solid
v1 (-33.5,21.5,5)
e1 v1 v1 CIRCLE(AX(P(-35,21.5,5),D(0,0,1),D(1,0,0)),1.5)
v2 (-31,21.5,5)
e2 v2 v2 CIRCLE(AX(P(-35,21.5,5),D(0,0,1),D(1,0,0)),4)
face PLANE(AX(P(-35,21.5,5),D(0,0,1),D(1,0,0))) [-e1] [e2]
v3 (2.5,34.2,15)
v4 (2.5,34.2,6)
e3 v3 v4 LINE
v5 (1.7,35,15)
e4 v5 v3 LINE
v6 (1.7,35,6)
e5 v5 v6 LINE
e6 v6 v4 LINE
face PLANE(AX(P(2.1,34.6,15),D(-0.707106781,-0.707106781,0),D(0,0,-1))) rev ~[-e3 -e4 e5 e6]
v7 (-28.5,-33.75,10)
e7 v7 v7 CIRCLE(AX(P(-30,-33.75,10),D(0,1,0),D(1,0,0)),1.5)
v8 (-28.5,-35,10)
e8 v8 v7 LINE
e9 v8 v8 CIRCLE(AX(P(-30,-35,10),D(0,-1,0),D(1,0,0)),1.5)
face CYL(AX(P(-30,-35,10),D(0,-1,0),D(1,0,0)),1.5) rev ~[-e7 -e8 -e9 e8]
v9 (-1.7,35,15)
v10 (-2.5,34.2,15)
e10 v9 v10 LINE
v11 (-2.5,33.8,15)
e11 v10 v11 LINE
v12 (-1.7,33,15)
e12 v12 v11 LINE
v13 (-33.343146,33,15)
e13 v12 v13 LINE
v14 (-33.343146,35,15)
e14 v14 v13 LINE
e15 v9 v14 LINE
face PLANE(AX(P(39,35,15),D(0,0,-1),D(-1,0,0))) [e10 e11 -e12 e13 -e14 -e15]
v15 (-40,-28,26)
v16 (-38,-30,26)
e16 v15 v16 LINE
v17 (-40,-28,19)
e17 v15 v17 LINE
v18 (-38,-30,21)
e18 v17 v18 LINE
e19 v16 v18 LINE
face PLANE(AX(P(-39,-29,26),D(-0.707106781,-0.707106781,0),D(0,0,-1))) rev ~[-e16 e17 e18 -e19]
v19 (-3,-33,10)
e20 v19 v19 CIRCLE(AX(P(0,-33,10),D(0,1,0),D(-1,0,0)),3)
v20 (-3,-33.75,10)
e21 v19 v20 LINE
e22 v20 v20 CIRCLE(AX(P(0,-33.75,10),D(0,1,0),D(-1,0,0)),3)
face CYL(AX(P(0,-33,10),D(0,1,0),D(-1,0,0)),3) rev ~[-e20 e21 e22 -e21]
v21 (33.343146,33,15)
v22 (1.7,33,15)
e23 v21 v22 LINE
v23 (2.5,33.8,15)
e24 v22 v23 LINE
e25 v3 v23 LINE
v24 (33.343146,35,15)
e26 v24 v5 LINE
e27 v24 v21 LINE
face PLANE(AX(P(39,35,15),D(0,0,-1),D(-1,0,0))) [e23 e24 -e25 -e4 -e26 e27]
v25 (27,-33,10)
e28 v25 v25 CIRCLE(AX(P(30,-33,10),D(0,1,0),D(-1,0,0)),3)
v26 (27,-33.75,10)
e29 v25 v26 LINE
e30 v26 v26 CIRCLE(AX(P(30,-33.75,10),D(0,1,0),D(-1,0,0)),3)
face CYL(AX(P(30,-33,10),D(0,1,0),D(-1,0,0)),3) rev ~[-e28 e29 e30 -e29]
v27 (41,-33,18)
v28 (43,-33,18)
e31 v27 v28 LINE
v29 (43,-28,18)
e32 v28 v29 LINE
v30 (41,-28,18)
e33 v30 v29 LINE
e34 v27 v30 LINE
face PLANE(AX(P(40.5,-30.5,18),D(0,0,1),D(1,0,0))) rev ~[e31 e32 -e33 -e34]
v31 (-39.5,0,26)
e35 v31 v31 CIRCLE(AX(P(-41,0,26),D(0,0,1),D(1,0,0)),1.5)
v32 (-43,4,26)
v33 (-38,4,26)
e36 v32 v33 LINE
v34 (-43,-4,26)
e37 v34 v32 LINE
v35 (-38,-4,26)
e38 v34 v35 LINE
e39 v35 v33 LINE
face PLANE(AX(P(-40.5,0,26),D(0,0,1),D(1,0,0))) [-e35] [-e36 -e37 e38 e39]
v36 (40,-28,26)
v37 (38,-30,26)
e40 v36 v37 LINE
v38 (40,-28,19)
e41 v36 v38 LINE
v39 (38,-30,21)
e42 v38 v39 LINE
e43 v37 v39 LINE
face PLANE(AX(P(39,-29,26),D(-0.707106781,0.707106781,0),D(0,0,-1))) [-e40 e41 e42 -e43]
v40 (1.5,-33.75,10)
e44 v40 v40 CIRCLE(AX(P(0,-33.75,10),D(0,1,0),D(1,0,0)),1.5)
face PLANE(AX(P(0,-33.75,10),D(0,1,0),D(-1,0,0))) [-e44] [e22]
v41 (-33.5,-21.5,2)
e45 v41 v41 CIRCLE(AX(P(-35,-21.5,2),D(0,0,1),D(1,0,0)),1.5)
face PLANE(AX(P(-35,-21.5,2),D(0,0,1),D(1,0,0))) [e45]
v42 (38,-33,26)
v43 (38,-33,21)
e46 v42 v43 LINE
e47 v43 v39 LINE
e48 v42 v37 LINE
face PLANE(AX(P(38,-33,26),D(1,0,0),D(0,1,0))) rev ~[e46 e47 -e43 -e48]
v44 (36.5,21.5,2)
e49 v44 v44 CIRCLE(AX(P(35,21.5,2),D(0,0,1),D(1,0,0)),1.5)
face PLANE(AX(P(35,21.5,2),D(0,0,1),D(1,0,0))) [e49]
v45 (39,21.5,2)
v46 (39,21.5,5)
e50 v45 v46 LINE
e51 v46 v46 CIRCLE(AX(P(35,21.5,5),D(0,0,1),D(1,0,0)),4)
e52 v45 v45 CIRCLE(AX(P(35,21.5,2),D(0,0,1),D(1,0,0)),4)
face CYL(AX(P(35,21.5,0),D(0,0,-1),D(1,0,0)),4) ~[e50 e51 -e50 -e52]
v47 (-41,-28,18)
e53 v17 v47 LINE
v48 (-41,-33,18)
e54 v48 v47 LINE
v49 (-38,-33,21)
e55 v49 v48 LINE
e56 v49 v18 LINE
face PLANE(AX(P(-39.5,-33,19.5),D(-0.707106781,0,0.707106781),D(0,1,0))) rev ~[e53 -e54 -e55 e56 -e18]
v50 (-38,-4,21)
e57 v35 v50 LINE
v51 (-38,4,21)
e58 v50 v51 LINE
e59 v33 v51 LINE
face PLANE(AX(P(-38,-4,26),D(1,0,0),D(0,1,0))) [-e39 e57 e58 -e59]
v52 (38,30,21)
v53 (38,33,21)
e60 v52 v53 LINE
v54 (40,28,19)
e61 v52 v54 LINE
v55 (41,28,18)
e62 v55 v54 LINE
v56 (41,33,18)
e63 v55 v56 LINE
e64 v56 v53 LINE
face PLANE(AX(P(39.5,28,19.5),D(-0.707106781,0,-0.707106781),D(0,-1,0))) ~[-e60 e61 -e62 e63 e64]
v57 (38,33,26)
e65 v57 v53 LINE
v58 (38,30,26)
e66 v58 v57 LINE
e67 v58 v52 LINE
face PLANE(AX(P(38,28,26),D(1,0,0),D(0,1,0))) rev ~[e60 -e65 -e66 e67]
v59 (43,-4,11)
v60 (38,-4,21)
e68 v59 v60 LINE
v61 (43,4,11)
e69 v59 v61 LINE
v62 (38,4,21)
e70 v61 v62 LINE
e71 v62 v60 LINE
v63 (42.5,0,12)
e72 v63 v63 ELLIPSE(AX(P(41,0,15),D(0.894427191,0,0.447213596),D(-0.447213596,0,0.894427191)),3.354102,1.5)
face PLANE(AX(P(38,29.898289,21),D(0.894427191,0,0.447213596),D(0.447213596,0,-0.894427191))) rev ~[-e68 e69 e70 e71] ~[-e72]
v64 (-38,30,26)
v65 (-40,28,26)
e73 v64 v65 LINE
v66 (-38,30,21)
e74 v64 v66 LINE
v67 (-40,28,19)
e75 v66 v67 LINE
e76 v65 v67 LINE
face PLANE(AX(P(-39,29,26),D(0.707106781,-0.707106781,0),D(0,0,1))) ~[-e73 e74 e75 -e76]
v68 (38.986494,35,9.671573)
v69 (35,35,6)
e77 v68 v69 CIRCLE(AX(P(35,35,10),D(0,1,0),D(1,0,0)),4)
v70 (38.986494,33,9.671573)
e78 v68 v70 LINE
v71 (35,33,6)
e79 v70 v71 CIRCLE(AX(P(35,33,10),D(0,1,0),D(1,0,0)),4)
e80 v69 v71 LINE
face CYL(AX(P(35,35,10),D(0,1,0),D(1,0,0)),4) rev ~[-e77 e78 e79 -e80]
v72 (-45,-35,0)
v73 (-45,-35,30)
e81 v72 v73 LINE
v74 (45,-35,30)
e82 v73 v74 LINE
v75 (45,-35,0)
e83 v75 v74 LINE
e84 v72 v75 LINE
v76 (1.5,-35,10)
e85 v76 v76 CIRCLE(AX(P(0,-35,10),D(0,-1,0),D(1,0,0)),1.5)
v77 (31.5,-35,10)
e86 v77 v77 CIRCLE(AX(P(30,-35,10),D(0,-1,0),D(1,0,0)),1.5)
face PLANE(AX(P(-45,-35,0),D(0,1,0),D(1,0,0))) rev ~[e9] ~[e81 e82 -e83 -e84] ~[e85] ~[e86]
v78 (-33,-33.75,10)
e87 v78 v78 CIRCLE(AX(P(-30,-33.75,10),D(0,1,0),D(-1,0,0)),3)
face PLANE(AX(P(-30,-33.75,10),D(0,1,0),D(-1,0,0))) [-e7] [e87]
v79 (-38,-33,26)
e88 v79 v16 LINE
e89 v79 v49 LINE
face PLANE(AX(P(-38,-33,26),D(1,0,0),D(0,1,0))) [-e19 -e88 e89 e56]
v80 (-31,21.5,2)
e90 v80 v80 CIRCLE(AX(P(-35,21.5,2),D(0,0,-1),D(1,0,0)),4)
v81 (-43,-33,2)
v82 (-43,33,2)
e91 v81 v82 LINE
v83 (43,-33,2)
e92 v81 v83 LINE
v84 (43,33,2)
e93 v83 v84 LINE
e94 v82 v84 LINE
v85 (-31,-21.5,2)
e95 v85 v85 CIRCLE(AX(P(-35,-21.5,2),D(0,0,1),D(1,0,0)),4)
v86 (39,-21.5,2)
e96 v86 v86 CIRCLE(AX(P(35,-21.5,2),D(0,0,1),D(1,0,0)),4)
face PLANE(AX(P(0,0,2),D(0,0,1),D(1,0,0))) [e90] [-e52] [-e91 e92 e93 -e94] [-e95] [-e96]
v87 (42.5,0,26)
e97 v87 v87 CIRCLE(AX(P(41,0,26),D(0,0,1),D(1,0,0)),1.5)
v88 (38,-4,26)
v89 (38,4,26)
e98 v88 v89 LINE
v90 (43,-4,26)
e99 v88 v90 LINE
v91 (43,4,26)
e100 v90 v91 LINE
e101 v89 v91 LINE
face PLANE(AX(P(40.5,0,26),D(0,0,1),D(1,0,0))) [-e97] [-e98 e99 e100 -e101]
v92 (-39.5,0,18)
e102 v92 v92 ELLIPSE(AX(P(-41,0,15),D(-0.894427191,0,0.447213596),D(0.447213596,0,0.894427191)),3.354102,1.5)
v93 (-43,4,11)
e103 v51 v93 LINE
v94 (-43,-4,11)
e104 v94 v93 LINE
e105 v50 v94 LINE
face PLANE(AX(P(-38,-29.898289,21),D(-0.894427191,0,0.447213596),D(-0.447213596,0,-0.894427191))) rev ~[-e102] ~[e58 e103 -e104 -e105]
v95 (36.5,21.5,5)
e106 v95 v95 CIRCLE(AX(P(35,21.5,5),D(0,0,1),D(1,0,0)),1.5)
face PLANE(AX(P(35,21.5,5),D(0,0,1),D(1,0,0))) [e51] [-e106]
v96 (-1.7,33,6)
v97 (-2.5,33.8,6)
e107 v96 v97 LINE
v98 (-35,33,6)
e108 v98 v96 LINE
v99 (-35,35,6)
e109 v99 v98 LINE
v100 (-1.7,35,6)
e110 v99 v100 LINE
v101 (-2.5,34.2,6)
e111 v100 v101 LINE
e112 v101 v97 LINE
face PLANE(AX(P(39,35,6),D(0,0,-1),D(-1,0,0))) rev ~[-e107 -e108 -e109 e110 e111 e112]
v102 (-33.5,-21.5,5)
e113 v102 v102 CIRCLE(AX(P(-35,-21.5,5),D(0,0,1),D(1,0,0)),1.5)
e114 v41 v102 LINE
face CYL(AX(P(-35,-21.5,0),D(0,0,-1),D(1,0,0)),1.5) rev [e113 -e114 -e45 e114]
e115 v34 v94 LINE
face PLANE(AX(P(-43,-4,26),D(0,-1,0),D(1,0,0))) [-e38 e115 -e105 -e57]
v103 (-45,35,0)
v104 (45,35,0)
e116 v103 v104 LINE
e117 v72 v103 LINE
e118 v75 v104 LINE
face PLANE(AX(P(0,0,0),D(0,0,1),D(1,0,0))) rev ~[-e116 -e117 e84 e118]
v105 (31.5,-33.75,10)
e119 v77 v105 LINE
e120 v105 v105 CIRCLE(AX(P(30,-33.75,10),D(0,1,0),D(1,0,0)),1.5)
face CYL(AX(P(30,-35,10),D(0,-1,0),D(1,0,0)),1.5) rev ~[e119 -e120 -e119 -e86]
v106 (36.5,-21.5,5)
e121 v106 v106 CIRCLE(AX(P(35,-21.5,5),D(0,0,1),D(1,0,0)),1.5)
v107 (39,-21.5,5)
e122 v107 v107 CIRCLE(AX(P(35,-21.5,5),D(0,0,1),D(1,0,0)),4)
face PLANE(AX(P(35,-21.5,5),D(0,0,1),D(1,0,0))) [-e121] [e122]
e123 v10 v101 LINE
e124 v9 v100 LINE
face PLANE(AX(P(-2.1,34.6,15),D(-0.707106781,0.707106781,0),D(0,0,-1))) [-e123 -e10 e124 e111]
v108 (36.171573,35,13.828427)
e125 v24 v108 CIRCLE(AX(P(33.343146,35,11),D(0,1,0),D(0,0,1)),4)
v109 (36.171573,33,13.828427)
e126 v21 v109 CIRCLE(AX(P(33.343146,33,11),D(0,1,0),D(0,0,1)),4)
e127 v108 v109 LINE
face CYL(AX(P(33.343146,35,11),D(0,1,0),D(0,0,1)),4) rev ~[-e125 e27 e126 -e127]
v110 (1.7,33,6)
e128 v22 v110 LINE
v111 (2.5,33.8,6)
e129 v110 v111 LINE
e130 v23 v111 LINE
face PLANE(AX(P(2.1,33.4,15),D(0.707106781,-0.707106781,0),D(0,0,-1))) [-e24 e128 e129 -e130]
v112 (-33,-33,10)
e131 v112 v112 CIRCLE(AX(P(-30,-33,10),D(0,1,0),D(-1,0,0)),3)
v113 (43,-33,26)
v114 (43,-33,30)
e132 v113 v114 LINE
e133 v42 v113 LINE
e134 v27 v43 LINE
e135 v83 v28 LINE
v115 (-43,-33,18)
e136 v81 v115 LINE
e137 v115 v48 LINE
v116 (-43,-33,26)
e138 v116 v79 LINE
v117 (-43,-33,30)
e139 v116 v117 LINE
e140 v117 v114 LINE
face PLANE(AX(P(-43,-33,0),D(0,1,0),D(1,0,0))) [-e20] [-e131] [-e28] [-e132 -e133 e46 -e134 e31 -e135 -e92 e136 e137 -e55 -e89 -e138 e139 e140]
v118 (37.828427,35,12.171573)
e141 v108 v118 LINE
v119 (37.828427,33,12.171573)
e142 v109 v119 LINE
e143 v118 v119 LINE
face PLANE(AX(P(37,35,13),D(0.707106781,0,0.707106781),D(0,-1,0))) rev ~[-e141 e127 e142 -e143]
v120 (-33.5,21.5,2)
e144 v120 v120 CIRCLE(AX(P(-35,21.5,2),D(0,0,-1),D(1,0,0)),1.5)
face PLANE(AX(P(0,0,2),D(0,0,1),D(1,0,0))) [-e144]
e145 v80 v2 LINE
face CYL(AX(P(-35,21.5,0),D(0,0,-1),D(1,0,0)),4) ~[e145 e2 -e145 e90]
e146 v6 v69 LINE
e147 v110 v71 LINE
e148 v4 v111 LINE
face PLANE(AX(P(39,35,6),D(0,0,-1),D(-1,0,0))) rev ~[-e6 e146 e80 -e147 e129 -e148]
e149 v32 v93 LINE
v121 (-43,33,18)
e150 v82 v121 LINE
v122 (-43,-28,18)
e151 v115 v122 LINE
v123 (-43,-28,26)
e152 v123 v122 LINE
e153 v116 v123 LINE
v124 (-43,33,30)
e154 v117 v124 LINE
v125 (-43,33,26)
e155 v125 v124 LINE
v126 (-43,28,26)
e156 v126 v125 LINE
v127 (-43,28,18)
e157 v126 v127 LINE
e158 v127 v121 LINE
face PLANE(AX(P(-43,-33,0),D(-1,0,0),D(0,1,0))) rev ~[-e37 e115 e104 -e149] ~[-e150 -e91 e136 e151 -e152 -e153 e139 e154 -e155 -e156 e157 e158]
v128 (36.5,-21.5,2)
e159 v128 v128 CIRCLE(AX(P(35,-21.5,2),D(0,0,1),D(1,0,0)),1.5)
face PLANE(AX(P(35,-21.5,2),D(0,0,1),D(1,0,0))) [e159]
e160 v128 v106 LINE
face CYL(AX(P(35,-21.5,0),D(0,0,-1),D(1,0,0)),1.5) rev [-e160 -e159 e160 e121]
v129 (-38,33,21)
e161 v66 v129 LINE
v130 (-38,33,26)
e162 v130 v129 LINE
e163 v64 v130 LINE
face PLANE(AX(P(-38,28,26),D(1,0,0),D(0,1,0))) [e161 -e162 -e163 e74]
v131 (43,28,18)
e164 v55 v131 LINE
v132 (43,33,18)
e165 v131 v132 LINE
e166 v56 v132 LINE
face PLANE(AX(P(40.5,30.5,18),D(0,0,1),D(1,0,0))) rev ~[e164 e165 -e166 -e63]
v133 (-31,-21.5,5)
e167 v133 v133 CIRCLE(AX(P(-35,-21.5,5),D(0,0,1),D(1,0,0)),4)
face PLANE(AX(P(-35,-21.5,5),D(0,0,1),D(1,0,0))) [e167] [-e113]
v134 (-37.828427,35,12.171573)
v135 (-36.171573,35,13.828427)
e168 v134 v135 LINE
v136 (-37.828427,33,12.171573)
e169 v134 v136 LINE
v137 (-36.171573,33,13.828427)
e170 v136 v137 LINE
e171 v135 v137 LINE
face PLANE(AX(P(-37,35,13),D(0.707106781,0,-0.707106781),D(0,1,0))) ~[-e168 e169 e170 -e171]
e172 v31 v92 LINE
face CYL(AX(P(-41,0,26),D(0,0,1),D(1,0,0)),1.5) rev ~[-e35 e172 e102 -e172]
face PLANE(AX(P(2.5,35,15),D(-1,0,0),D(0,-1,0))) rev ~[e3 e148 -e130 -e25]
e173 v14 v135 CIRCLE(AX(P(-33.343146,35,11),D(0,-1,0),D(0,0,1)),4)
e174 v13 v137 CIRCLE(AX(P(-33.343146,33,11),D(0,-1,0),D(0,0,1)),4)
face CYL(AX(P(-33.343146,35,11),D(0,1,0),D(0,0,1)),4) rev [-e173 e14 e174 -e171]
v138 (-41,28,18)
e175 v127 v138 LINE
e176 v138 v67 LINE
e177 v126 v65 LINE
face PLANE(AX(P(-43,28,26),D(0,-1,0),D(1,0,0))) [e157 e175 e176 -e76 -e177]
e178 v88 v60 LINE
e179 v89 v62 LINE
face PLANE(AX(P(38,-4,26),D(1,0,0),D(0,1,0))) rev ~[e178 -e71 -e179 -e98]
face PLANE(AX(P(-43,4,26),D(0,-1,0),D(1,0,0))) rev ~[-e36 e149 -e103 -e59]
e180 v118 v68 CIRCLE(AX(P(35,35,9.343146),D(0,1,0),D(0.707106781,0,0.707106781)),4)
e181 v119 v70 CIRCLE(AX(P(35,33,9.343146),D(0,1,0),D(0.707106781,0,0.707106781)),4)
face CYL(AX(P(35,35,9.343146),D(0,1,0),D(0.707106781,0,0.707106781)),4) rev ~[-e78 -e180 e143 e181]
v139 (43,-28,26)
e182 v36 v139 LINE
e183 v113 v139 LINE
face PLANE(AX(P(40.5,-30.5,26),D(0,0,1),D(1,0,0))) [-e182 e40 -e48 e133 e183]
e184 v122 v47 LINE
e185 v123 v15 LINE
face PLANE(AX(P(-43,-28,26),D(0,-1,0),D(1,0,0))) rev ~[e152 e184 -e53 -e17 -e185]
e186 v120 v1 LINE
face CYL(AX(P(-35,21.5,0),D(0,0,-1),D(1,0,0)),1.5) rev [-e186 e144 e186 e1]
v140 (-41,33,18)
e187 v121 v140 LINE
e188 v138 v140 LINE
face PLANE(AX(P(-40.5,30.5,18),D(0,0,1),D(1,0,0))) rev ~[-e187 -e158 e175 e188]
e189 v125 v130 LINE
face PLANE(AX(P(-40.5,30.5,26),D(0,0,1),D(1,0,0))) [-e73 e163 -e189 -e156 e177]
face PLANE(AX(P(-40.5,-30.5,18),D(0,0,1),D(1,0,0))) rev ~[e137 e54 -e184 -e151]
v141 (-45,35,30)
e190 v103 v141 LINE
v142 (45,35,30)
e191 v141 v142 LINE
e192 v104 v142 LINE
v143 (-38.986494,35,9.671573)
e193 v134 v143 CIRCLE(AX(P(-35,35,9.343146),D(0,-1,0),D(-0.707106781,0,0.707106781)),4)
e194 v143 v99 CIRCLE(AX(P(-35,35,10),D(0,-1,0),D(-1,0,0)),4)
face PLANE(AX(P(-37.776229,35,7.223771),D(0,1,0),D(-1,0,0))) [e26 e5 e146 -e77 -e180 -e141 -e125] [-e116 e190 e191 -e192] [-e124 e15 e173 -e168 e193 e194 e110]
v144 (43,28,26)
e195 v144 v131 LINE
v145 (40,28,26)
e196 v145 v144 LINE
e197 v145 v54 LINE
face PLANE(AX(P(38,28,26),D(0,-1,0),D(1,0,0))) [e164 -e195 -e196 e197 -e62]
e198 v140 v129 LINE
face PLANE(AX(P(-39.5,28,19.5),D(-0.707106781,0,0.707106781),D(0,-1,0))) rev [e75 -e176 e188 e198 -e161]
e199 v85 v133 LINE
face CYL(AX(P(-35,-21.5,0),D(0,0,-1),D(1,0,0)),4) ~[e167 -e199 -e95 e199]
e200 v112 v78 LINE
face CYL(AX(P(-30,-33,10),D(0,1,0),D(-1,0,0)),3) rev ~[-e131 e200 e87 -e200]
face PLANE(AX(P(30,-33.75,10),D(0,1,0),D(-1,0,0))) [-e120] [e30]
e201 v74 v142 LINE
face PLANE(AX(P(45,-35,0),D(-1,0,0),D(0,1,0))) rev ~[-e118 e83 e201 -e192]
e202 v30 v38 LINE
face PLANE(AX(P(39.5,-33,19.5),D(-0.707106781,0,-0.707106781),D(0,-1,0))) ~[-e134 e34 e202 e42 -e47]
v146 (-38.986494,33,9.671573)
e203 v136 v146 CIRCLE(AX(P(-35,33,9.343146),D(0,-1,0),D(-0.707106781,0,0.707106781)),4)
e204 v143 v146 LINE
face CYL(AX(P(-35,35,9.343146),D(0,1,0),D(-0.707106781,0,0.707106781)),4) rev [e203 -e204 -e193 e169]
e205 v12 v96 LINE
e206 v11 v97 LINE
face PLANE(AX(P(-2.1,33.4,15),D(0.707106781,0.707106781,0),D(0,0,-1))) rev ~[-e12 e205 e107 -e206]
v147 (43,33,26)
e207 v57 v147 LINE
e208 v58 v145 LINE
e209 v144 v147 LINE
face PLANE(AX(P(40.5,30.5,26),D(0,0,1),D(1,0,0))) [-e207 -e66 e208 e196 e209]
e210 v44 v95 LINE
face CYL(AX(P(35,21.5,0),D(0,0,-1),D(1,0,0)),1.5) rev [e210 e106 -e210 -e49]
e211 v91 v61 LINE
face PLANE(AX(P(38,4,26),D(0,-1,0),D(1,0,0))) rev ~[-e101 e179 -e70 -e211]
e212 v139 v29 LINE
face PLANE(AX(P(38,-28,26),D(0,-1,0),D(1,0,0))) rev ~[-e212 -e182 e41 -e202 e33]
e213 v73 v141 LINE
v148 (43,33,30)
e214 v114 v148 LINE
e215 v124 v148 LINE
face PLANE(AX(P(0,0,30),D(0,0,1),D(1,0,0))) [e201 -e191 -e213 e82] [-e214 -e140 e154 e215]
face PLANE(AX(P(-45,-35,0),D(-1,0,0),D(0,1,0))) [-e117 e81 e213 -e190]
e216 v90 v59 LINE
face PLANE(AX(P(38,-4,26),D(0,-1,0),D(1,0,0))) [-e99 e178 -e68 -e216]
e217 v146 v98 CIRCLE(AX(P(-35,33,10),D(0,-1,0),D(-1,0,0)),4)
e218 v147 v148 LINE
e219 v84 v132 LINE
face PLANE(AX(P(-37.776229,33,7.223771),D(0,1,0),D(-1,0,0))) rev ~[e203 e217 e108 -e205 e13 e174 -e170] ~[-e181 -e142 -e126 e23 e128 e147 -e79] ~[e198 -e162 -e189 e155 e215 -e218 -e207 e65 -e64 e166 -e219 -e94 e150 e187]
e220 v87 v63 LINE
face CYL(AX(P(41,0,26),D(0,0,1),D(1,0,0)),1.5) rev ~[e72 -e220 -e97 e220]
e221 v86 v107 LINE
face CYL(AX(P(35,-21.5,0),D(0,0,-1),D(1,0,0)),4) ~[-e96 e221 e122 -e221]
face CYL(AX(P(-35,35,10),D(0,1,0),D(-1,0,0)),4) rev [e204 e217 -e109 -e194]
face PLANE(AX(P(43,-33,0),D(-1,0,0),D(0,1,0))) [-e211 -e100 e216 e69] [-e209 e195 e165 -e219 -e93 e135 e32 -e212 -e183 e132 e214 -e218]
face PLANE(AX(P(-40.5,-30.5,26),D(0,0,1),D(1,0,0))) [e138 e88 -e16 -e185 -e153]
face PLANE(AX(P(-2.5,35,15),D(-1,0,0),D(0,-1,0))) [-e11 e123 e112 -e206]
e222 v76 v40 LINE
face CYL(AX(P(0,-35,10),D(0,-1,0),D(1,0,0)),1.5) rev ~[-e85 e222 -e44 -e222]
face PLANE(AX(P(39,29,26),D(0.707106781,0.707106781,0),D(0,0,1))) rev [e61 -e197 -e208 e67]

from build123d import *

# Parameters (mm, degrees)
F0_R         = 4
F0_R_2       = 1.5
F1_DEPTH     = 5
F0_W         = 86
F0_H         = 66
F2_DEPTH     = 2
F0_W_2       = 90
F0_H_2       = 70
F3_DEPTH     = 30
F4_R         = 1.5
F5_DEPTH     = 2
F6_R         = 3
F6_R_2       = 1.5
F7_DEPTH     = 0.75
F9_W         = 5
F9_H         = 5
F10_DEPTH    = 8
F11_C1_SIZE  = 3
F11_C2_SIZE  = 3
F11_C3_SIZE  = 3
F11_C4_SIZE  = 3
F12_SIZE     = 2
F13_W        = 78
F13_H        = 9
F14_DEPTH    = 2
F15_SIZE     = 4
F16_T1_DEPTH = 2
F17_W        = 5
F17_H        = 2
F18_DEPTH    = 9
F19_SIZE     = 0.8
F9_H_2       = 8
F9_R         = 1.5
F20_DEPTH    = 15
F21_T4_DEPTH = 59.7965774757
F21_T9_DEPTH = 59.7965774757


# Not quite as in the source:
# - a fillet or chamfer that OpenCascade refuses, or shapes differently, is made with other operations: its cross-section is extruded or revolved along the edge and cut away or added
# - two fillets or chamfers of one size are made in one step


with BuildPart() as f1:
    # F0 (on Top) → F1 (new body)
    with BuildSketch(Plane.XY):
        with Locations((-35, 21.5)):
            Circle(F0_R)
        with Locations((-35, 21.5)):
            Circle(F0_R_2, mode=Mode.SUBTRACT)
    extrude(amount=F1_DEPTH)



with BuildPart() as f1b:
    # F0 (on Top) → F1, piece 2 (new body)
    with BuildSketch(Plane.XY):
        with Locations((35, 21.5)):
            Circle(F0_R)
        with Locations((35, 21.5)):
            Circle(F0_R_2, mode=Mode.SUBTRACT)
    extrude(amount=F1_DEPTH)


with BuildPart() as f1c:
    # F0 (on Top) → F1, piece 3 (new body)
    with BuildSketch(Plane.XY):
        with Locations((35, -21.5)):
            Circle(F0_R)
        with Locations((35, -21.5)):
            Circle(F0_R_2, mode=Mode.SUBTRACT)
    extrude(amount=F1_DEPTH)


with BuildPart() as f1d:
    # F0 (on Top) → F1, piece 4 (new body)
    with BuildSketch(Plane.XY):
        with Locations((-35, -21.5)):
            Circle(F0_R)
        with Locations((-35, -21.5)):
            Circle(F0_R_2, mode=Mode.SUBTRACT)
    extrude(amount=F1_DEPTH)


with BuildPart() as f1_1:
    add(f1.part)

    add(f1b.part)  # F2 merges F1b

    add(f1c.part)  # F2 merges F1c

    add(f1d.part)  # F2 merges F1d
    # F0 (on Top) → F2 (join)
    with BuildSketch(Plane.XY):
        Rectangle(F0_W, F0_H)
        with Locations((-35, -21.5)):
            Circle(F0_R, mode=Mode.SUBTRACT)
        with Locations((35, -21.5)):
            Circle(F0_R, mode=Mode.SUBTRACT)
        with Locations((-35, 21.5)):
            Circle(F0_R, mode=Mode.SUBTRACT)
        with Locations((35, 21.5)):
            Circle(F0_R, mode=Mode.SUBTRACT)
        with Locations((-35, 21.5)):
            Circle(F0_R)
        with Locations((-35, 21.5)):
            Circle(F0_R_2, mode=Mode.SUBTRACT)
        with Locations((35, 21.5)):
            Circle(F0_R_2)
        with Locations((35, -21.5)):
            Circle(F0_R_2)
        with Locations((-35, -21.5)):
            Circle(F0_R_2)
        with Locations((-35, 21.5)):
            Circle(F0_R_2)
    extrude(amount=F2_DEPTH)

    # F0 (on Top) → F3 (join)
    with BuildSketch(Plane.XY):
        Rectangle(F0_W_2, F0_H_2)
        Rectangle(F0_W, F0_H, mode=Mode.SUBTRACT)
    extrude(amount=F3_DEPTH)

    # F4 (on face) → F5 (cut, through all)
    with BuildSketch(Plane.XZ.offset(35)):
        with Locations((-30, 10)):
            Circle(F4_R)
        with Locations((0, 10)):
            Circle(F4_R)
        with Locations((30, 10)):
            Circle(F4_R)
    extrude(amount=-F5_DEPTH, mode=Mode.SUBTRACT)

    # F6 (on face) → F7 (cut)
    with BuildSketch(Plane(origin=(0, -33, 0), x_dir=(-1, 0, 0), z_dir=(0, 1, 0))):
        with Locations((-30, 10)):
            Circle(F6_R)
        with Locations((-30, 10)):
            Circle(F6_R_2, mode=Mode.SUBTRACT)
        with Locations((0, 10)):
            Circle(F6_R)
        with Locations((0, 10)):
            Circle(F6_R_2, mode=Mode.SUBTRACT)
        with Locations((30, 10)):
            Circle(F6_R)
        with Locations((30, 10)):
            Circle(F6_R_2, mode=Mode.SUBTRACT)
    extrude(amount=-F7_DEPTH, mode=Mode.SUBTRACT)

    # F9 (on offset) → F10 (join)
    with BuildSketch(Plane.XY.offset(26)):
        with Locations((40.5, -30.5)):
            Rectangle(F9_W, F9_H)
        with Locations((40.5, 30.5)):
            Rectangle(F9_W, F9_H)
        with Locations((-40.5, -30.5)):
            Rectangle(F9_W, F9_H)
        with Locations((-40.5, 30.5)):
            Rectangle(F9_W, F9_H)
    extrude(amount=-F10_DEPTH)

    # F11: chamfer of 3 on 4 edges, made by hand

    # F11_c1
    f11_c1_edges = [f1_1.edges().sort_by_distance(p)[0] for p in [
        (-38, -30.5, 18),
    ]]
    chamfer(f11_c1_edges, length=F11_C1_SIZE)

    # F11_c2
    f11_c2_edges = [f1_1.edges().sort_by_distance(p)[0] for p in [
        (38, -30.5, 18),
    ]]
    chamfer(f11_c2_edges, length=F11_C2_SIZE)

    # F11_c3
    f11_c3_edges = [f1_1.edges().sort_by_distance(p)[0] for p in [
        (-38, 30.5, 18),
    ]]
    chamfer(f11_c3_edges, length=F11_C3_SIZE)

    # F11_c4
    f11_c4_edges = [f1_1.edges().sort_by_distance(p)[0] for p in [
        (38, 30.5, 18),
    ]]
    chamfer(f11_c4_edges, length=F11_C4_SIZE)

    # F12
    f12_edges = [f1_1.edges().sort_by_distance(p)[0] for p in [
        (-38, 28, 23.5),
        (-38, -28, 23.5),
        (38, -28, 23.5),
        (38, 28, 23.5),
    ]]
    chamfer(f12_edges, length=F12_SIZE)

    # F13 (on face) → F14 (cut, through all)
    with BuildSketch(Plane(origin=(0, 35, 0), x_dir=(-1, 0, 0), z_dir=(0, 1, 0))):
        with Locations((0, 10.5)):
            Rectangle(F13_W, F13_H)
    extrude(amount=-F14_DEPTH, mode=Mode.SUBTRACT)

    # F15
    f15_edges = [f1_1.edges().sort_by_distance(p)[0] for p in [
        (-39, 34, 15),
        (39, 34, 15),
    ]]
    chamfer(f15_edges, length=F15_SIZE)

    # F16: fillet of radius 4 on 6 edges, made by hand

    # F16_s2 → F16_t1 (join)
    with BuildSketch(Plane.XZ.offset(-35)):
        with BuildLine():
            ThreePointArc((-39, 10), (-37.8284271247, 7.1715728753), (-35, 6))
            Line((-35, 6), (-39, 6))
            Line((-39, 6), (-39, 10))
        make_face()
        with BuildLine():
            ThreePointArc((39, 10), (37.8284271247, 7.1715728753), (35, 6))
            Line((35, 6), (39, 6))
            Line((39, 6), (39, 10))
        make_face()
        with BuildLine():
            ThreePointArc((-33.3431457505, 15), (-34.87387948, 14.69551813), (-36.1715728753, 13.8284271247))
            Line((-36.1715728753, 13.8284271247), (-35, 15))
            Line((-35, 15), (-33.3431457505, 15))
        make_face()
        with BuildLine():
            ThreePointArc((33.3431457505, 15), (34.87387948, 14.69551813), (36.1715728753, 13.8284271247))
            Line((36.1715728753, 13.8284271247), (35, 15))
            Line((35, 15), (33.3431457505, 15))
        make_face()
        with BuildLine():
            ThreePointArc((-37.8284271247, 12.1715728753), (-38.69551813, 10.87387948), (-39, 9.3431457505))
            Line((-39, 9.3431457505), (-39, 11))
            Line((-39, 11), (-37.8284271247, 12.1715728753))
        make_face()
        with BuildLine():
            ThreePointArc((37.8284271247, 12.1715728753), (38.69551813, 10.87387948), (39, 9.3431457505))
            Line((39, 9.3431457505), (39, 11))
            Line((39, 11), (37.8284271247, 12.1715728753))
        make_face()
    extrude(amount=F16_T1_DEPTH)

    # F17 (on face) → F18 (join, through all)
    with BuildSketch(Plane(origin=(0, 0, 15), x_dir=(1, 0, 0), z_dir=(0, 0, -1))):
        with Locations((0, -34)):
            Rectangle(F17_W, F17_H)
    extrude(amount=F18_DEPTH)

    # F19
    f19_edges = [f1_1.edges().sort_by_distance(p)[0] for p in [
        (2.5, 35, 10.5),
        (-2.5, 35, 10.5),
        (2.5, 33, 10.5),
        (-2.5, 33, 10.5),
    ]]
    chamfer(f19_edges, length=F19_SIZE)

    # F9 (on offset) → F20 (join)
    with BuildSketch(Plane.XY.offset(26)):
        with Locations((-40.5, 0)):
            Rectangle(F9_W, F9_H_2)
        with Locations((-41, 0)):
            Circle(F9_R, mode=Mode.SUBTRACT)
        with Locations((40.5, 0)):
            Rectangle(F9_W, F9_H_2)
        with Locations((41, 0)):
            Circle(F9_R, mode=Mode.SUBTRACT)
    extrude(amount=-F20_DEPTH)

    # F21: chamfer of 5 x 10 on 2 edges, made by hand


with BuildPart() as f21_tool2:
    # F21_s3 → F21_t4 (new body)
    with BuildSketch(Plane.XZ.offset(-29.8982887379)):
        Polygon((38, 21), (43, 11), (38, 11), align=None)
    extrude(amount=F21_T4_DEPTH)

    split(bisect_by=Plane.YZ.offset(43), keep=Keep.BOTTOM)


with BuildPart() as f1_2:
    add(f1_1.part)

    # F21_t1: cut F21_tool2
    add(f21_tool2.part, mode=Mode.SUBTRACT)


with BuildPart() as f21_tool7:
    # F21_s8 → F21_t9 (new body)
    with BuildSketch(Plane.XZ.offset(29.8982887379)):
        Polygon((-38, 21), (-43, 11), (-38, 11), align=None)
    extrude(amount=-F21_T9_DEPTH)

    split(bisect_by=Plane.YZ.offset(-43), keep=Keep.TOP)


with BuildPart() as f1_3:
    add(f1_2.part)

    # F21_t6: cut F21_tool7
    add(f21_tool7.part, mode=Mode.SUBTRACT)


solid = f1_3.part
